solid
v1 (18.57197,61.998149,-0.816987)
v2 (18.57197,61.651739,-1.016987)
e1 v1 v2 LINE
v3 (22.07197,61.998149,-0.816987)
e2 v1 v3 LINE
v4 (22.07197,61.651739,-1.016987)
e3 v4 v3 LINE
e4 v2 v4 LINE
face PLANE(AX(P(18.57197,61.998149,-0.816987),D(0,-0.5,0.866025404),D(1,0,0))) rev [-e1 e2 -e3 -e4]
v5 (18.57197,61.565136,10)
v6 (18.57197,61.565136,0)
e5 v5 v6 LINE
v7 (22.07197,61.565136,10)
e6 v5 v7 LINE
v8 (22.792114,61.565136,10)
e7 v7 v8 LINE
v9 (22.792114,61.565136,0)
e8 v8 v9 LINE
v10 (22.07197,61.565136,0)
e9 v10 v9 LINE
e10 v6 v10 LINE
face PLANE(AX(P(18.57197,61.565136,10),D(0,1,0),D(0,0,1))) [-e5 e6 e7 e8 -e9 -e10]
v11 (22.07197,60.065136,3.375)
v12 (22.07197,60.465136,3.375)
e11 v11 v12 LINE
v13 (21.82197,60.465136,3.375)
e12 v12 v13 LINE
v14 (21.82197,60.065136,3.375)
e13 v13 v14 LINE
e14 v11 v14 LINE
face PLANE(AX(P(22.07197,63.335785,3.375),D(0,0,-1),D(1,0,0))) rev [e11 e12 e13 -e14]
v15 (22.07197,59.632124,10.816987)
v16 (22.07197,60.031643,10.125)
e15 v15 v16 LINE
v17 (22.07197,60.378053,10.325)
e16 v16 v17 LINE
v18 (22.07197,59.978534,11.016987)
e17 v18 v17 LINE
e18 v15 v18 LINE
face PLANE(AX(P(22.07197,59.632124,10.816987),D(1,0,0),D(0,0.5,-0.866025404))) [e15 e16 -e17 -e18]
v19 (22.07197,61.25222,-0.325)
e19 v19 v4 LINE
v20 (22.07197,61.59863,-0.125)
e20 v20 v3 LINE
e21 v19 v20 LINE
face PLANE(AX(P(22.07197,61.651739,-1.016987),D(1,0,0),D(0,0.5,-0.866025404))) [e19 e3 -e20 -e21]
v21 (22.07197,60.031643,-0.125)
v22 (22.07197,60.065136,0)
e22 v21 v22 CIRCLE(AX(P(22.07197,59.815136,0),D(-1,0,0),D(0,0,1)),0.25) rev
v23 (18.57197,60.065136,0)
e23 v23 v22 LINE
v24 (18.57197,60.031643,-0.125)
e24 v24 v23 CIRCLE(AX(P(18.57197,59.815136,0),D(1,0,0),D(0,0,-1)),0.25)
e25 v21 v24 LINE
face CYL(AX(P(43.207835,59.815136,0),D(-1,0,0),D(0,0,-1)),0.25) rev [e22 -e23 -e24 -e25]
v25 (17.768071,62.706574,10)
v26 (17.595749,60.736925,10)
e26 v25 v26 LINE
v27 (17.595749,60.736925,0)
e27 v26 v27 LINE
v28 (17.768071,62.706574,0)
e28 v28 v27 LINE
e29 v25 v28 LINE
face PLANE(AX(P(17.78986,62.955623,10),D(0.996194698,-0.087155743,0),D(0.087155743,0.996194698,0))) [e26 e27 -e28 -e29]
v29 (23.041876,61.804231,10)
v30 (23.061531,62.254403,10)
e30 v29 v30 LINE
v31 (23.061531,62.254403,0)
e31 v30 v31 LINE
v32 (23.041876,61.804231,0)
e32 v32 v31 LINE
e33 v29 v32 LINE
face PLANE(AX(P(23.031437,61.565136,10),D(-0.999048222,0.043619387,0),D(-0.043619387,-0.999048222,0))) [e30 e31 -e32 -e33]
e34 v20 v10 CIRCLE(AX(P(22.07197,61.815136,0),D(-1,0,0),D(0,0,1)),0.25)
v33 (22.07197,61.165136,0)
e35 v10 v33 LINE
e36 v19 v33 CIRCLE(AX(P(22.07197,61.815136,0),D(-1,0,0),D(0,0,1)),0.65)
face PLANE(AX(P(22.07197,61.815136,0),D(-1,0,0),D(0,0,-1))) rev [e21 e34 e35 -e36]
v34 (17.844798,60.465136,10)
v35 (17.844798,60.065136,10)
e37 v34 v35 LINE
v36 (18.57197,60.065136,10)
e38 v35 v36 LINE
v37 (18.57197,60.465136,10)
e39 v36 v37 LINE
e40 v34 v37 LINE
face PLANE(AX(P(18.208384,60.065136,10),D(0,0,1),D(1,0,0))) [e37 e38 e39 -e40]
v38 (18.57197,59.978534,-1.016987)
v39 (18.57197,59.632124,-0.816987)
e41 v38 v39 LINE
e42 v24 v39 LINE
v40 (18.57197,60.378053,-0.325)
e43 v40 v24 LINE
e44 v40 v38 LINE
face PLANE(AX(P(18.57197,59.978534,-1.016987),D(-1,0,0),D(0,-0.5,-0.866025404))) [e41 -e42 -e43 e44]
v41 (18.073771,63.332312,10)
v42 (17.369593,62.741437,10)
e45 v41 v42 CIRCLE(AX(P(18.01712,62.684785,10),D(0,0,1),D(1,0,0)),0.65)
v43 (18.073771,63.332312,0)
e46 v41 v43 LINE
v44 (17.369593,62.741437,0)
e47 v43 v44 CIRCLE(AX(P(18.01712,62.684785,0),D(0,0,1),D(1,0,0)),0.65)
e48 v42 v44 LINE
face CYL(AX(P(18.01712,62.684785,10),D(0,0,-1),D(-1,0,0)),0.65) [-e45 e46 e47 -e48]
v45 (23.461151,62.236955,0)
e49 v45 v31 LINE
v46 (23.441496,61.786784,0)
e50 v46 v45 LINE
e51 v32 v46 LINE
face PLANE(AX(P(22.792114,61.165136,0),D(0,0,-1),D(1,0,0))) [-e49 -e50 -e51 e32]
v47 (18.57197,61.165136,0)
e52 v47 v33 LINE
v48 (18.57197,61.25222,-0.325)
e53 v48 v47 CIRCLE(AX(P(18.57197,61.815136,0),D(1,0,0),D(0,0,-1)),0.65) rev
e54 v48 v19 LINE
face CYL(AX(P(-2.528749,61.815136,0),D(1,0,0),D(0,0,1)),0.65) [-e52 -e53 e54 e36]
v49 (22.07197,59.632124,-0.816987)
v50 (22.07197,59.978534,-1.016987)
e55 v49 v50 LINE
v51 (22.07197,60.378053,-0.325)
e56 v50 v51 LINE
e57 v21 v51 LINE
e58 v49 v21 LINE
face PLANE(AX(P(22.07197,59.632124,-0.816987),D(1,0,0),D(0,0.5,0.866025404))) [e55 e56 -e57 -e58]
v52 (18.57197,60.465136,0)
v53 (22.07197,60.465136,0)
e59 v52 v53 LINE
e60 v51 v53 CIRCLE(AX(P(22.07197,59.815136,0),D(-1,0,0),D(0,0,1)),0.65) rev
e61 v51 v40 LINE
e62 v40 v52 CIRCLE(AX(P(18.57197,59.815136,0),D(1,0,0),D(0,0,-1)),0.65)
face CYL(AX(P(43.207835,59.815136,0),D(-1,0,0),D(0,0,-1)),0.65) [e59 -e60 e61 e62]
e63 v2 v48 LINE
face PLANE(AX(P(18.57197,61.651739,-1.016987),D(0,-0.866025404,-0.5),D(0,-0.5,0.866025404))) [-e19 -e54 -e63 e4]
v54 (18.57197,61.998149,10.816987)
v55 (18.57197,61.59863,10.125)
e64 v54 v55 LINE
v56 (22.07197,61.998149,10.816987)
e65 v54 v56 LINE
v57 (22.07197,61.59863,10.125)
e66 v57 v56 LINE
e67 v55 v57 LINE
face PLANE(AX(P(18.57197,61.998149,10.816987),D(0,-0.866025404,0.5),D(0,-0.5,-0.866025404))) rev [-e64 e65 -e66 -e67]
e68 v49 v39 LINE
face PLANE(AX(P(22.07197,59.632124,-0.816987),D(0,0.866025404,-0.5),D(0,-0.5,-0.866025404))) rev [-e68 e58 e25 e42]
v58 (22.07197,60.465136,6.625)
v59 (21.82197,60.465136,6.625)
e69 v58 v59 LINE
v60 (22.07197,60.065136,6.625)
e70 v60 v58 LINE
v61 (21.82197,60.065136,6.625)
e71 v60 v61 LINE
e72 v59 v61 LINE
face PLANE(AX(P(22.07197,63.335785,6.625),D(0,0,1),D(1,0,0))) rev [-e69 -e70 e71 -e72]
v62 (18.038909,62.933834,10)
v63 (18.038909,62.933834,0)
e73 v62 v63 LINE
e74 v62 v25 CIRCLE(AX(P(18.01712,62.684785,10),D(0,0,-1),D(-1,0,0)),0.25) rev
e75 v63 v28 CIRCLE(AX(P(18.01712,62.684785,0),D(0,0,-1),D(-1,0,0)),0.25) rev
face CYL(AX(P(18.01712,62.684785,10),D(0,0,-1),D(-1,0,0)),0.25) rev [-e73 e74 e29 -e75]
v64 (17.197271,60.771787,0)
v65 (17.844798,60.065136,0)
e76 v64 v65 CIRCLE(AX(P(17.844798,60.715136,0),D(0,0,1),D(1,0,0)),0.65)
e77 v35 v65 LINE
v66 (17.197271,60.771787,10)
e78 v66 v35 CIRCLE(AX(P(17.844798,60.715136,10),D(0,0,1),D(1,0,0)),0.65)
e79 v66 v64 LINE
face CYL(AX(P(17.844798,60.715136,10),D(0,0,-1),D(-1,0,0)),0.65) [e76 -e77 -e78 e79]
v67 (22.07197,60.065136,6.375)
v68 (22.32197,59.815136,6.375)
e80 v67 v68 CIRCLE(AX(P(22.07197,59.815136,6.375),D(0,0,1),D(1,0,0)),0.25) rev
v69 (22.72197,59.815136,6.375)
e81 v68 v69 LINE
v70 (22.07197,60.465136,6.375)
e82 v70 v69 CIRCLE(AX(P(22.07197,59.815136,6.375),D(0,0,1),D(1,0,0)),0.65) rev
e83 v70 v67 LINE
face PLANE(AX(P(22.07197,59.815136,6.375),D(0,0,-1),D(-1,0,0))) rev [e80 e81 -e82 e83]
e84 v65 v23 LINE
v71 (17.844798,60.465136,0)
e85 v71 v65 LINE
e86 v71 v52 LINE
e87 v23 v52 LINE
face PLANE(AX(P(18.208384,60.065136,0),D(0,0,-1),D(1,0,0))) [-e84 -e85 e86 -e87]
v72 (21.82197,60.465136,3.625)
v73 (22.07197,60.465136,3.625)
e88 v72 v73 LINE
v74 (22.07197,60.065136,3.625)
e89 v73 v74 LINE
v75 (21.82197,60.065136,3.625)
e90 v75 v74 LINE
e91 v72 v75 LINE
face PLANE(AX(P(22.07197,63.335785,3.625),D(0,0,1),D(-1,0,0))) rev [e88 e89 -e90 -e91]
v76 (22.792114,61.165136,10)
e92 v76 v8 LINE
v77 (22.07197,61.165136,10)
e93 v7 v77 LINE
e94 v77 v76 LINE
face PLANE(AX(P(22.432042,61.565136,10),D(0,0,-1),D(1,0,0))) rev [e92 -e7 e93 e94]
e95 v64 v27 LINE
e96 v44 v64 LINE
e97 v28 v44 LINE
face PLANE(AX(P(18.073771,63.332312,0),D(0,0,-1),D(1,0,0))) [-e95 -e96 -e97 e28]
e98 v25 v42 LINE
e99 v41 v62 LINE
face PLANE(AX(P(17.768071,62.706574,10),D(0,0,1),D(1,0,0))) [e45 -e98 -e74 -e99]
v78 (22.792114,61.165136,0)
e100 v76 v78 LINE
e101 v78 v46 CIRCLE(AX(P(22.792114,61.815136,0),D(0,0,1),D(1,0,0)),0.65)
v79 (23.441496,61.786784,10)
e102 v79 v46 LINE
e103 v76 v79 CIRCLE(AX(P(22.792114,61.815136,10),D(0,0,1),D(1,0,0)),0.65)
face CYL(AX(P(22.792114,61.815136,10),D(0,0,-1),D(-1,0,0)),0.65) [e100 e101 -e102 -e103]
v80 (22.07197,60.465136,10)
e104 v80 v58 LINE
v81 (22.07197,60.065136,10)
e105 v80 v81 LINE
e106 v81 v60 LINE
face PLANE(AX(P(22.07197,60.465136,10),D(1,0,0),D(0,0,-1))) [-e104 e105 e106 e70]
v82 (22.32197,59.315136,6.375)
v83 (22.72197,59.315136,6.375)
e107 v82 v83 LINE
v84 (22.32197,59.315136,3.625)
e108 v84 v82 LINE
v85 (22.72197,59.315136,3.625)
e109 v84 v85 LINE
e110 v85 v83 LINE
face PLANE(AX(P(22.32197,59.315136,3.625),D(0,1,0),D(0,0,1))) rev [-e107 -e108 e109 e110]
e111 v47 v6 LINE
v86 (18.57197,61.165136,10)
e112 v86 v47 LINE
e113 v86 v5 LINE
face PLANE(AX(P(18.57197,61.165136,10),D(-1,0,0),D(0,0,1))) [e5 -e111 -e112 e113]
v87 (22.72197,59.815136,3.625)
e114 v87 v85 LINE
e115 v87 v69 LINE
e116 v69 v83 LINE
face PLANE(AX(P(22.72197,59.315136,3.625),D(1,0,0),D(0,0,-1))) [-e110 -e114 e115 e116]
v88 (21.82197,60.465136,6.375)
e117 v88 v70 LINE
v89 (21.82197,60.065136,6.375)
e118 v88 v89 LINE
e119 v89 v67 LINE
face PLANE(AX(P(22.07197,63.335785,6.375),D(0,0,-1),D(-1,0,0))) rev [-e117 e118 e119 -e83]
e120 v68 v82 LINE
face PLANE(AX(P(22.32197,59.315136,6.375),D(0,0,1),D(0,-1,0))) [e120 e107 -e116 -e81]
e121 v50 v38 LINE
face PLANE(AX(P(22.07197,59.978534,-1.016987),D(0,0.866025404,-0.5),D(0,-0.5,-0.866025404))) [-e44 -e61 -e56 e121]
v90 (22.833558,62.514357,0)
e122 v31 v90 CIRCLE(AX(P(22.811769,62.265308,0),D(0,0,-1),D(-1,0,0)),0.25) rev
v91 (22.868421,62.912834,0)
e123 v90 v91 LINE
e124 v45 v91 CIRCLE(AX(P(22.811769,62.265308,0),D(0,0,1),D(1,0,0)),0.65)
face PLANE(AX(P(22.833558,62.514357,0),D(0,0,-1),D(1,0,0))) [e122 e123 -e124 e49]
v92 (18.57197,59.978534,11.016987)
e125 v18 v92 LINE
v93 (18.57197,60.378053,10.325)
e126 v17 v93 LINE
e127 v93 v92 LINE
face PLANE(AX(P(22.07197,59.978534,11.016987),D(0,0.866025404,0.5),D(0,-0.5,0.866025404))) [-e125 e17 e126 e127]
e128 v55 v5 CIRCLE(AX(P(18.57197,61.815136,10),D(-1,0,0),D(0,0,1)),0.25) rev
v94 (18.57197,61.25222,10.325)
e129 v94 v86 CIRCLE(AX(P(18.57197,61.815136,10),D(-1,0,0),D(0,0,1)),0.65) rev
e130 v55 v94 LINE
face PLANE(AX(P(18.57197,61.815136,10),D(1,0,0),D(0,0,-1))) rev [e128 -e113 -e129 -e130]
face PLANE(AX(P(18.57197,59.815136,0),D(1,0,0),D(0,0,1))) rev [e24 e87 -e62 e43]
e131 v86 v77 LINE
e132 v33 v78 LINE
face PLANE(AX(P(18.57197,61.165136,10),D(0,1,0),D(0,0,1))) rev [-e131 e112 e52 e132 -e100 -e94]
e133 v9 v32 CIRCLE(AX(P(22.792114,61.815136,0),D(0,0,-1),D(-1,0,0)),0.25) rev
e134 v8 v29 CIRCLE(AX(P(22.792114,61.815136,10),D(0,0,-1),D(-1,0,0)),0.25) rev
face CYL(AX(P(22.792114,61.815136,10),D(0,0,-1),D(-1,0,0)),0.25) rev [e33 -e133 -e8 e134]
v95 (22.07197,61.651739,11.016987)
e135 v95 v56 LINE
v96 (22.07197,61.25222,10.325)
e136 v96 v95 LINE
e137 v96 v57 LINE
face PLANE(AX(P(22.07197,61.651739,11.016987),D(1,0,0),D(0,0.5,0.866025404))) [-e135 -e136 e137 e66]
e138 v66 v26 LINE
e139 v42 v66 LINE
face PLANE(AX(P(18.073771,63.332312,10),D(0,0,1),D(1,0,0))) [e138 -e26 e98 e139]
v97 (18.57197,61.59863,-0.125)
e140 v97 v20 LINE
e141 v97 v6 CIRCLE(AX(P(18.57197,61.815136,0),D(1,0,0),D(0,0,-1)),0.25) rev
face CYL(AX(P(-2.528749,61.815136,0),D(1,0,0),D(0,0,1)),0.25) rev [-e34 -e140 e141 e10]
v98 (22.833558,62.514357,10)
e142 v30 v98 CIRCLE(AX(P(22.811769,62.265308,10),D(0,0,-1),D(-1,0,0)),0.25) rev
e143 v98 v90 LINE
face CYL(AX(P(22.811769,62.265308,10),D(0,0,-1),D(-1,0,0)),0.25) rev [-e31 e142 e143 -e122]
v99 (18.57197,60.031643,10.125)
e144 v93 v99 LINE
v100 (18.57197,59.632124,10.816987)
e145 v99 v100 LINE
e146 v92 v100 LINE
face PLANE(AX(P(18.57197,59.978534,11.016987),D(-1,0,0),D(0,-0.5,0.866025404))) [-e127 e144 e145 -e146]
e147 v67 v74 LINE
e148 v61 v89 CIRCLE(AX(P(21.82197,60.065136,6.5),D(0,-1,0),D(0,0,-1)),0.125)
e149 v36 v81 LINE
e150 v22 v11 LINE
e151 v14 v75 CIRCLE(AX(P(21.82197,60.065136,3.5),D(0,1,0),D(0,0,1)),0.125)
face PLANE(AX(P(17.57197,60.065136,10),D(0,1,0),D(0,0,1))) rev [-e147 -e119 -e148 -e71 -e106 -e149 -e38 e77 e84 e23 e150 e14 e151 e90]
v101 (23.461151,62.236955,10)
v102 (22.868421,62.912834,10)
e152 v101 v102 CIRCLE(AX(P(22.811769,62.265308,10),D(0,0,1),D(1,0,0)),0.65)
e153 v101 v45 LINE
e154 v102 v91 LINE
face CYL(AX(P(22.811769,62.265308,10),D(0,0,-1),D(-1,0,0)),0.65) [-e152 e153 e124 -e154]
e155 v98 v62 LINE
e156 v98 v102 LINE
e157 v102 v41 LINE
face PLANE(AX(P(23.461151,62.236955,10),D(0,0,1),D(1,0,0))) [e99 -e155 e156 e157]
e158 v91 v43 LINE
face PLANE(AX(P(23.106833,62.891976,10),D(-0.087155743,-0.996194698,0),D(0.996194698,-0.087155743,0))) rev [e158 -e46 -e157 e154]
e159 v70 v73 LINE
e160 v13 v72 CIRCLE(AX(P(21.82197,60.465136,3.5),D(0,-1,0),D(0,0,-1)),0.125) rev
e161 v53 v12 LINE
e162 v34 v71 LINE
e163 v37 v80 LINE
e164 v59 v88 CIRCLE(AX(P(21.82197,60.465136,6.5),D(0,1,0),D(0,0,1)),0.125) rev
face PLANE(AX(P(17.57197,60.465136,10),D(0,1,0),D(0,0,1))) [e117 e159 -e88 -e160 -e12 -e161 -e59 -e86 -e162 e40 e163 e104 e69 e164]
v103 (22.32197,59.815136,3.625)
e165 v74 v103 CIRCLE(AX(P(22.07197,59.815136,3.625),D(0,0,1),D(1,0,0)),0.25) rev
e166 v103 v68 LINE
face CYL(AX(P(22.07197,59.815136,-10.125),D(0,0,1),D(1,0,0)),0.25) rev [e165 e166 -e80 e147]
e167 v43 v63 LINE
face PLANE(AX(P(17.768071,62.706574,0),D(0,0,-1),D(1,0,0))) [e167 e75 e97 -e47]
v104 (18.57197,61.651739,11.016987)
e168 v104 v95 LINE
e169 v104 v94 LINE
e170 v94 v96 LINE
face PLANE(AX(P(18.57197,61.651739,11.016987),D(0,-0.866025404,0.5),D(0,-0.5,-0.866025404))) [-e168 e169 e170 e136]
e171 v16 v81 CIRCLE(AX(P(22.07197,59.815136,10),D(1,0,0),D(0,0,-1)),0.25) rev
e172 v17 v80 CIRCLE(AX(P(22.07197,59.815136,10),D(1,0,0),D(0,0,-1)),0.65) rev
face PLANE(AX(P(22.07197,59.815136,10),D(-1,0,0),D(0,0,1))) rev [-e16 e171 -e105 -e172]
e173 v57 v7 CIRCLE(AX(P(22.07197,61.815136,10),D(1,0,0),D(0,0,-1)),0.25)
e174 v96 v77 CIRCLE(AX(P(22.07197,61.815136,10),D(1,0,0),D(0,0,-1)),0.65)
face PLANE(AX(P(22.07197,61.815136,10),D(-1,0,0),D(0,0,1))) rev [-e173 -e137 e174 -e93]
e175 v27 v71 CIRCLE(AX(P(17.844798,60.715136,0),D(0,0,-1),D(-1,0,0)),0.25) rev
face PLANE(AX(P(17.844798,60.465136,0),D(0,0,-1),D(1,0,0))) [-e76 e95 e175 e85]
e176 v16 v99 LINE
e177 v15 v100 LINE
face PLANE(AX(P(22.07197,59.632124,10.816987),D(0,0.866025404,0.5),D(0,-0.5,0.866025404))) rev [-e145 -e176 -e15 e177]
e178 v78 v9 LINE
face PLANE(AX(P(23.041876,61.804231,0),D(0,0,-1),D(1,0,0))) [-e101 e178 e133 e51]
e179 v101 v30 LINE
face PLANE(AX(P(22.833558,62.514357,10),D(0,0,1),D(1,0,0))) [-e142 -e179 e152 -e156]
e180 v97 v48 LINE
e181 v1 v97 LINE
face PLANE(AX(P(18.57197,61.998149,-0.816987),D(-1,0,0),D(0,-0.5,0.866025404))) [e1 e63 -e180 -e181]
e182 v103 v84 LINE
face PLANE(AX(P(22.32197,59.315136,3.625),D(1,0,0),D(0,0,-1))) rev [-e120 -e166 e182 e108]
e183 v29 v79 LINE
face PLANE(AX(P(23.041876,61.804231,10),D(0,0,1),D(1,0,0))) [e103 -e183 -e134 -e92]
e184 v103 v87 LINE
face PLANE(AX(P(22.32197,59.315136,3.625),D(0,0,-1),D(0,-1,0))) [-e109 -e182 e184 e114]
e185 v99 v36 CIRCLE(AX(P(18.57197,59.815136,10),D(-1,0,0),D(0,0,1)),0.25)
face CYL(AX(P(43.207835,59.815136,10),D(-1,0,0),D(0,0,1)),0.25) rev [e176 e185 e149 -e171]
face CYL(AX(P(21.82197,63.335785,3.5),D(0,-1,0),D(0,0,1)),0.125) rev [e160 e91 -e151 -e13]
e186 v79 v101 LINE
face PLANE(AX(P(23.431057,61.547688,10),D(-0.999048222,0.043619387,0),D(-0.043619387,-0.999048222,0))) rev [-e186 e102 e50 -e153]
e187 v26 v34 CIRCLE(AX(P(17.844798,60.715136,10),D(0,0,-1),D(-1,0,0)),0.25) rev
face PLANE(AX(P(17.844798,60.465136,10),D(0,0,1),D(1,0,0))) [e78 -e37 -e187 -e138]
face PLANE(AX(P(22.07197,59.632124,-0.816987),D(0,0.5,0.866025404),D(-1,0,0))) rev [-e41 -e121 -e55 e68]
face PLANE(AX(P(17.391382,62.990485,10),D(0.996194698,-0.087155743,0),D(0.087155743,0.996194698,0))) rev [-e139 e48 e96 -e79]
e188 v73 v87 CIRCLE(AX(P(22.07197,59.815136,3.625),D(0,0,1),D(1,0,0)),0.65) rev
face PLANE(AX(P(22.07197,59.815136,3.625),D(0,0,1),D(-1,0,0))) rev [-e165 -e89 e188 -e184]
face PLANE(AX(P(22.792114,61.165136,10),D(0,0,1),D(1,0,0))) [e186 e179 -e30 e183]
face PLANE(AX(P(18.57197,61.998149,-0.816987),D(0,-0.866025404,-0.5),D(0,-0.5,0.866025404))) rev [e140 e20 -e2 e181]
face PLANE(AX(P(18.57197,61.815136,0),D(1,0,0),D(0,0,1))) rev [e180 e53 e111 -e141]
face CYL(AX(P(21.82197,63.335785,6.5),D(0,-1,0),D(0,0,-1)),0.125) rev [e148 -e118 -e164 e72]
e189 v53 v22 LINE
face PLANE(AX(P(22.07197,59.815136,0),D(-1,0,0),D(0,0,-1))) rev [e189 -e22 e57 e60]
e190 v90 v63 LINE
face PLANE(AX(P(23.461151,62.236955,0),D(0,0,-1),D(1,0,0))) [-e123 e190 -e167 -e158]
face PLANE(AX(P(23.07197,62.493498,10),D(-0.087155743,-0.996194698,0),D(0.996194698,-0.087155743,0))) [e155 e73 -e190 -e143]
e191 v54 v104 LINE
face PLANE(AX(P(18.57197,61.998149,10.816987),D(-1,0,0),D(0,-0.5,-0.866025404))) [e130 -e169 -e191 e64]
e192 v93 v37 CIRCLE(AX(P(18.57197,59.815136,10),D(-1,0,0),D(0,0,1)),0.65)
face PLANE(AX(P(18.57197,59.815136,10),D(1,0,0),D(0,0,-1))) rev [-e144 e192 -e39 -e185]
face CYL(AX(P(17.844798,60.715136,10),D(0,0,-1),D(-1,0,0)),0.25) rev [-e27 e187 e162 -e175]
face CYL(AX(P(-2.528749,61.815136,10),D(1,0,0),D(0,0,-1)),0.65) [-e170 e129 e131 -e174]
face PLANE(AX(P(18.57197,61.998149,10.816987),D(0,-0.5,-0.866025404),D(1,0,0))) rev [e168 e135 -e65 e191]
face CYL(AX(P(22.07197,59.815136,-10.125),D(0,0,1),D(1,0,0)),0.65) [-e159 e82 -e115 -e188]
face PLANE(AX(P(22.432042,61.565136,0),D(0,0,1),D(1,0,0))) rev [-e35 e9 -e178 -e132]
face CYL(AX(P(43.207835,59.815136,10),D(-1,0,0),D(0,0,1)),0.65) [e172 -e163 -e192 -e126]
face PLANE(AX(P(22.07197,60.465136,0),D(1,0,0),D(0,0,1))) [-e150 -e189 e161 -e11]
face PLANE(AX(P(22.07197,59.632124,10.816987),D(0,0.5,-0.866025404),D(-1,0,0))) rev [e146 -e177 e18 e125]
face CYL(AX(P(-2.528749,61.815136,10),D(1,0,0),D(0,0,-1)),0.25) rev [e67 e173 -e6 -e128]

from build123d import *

# Parameters (mm, degrees)
BASE_FLANGE1_DEPTH       = 10
CUT_EXTRUDE1_REACH       = 27.713
MITER_START              = 3.625
MITER_FLANGE1_DEPTH      = 2.75
MITER_START_2            = 18.571970472
MITER_FLANGE4_DEPTH      = 4.220143907
MITER_START_3            = 17.844797598
MITER_FLANGE5_DEPTH      = 4.227172874
CUT_EXTRUDE8_DEPTH       = 0.727172875
CUT_EXTRUDE9_START       = -0.720143907
CUT_EXTRUDE9_DEPTH       = 0.720143907
CUT_EXTRUDE10_DEPTH      = 22.568364065
CUT_EXTRUDE10_DEPTH_BACK = 22.568364065
SKETCH26_W               = 10.008347653
SKETCH26_H               = 5.563663723


# Read off the part's stored shape, not the designer's step: Miter Flange1, Miter Flange4, Miter Flange5
# Sheet-metal steps are written as plain solids
with BuildPart() as part:
    # Sketch1 → Base-Flange1 (new body)
    with BuildSketch(Plane.XY):
        with BuildLine():
            Line((18.571970472, 61.565136218), (22.792114379, 61.565136218))
            ThreePointArc((22.792114379, 61.565136218), (22.964992643, 61.634545227), (23.041876434, 61.804231371))
            Line((23.041876434, 61.804231371), (23.061531352, 62.254403009))
            ThreePointArc((23.061531352, 62.254403009), (22.999729249, 62.43014431), (22.833558233, 62.51435653))
            Line((22.833558233, 62.51435653), (18.038908504, 62.933834027))
            ThreePointArc((18.038908504, 62.933834027), (17.856422666, 62.876296464), (17.768070893, 62.706574288))
            Line((17.768070893, 62.706574288), (17.595748923, 60.736925153))
            ThreePointArc((17.595748923, 60.736925153), (17.660478263, 60.546238666), (17.844797598, 60.465136218))
            Line((17.844797598, 60.465136218), (22.071970472, 60.465136218))
            Line((22.071970472, 60.465136218), (22.071970472, 60.065136218))
            Line((22.071970472, 60.065136218), (17.844797598, 60.065136218))
            ThreePointArc((17.844797598, 60.065136218), (17.365567329, 60.276002583), (17.197271044, 60.771787451))
            Line((17.197271044, 60.771787451), (17.369593014, 62.741436586))
            ThreePointArc((17.369593014, 62.741436586), (17.599307622, 63.182714241), (18.073770801, 63.332311907))
            Line((18.073770801, 63.332311907), (22.86842053, 62.91283441))
            ThreePointArc((22.86842053, 62.91283441), (23.300465172, 62.693882636), (23.461150641, 62.236955254))
            Line((23.461150641, 62.236955254), (23.441495723, 61.786783616))
            ThreePointArc((23.441495723, 61.786783616), (23.241597865, 61.345599642), (22.792114379, 61.165136218))
            Line((22.792114379, 61.165136218), (18.571970472, 61.165136218))
            Line((18.571970472, 61.165136218), (18.571970472, 61.565136218))
        make_face()
    extrude(amount=BASE_FLANGE1_DEPTH)

    # Sketch7 → Cut-Extrude1 (cut, up to next)
    with BuildSketch(Plane.XZ.offset(-60.065136218), mode=Mode.PRIVATE) as cut_extrude1_sk1:
        with BuildLine():
            Line((22.071970472, 3.375), (21.821970472, 3.375))
            ThreePointArc((21.821970472, 3.375), (21.696970472, 3.5), (21.821970472, 3.625))
            Line((21.821970472, 3.625), (22.071970472, 3.625))
            ThreePointArc((22.071970472, 3.625), (22.196970472, 3.5), (22.071970472, 3.375))
        make_face()
    cut_extrude1_tool1 = extrude(cut_extrude1_sk1.sketch, amount=-CUT_EXTRUDE1_REACH, mode=Mode.PRIVATE) & part.part
    # Sketch7 → Cut-Extrude1 (cut, up to next)
    with BuildSketch(Plane.XZ.offset(-60.065136218), mode=Mode.PRIVATE) as cut_extrude1_sk2:
        with BuildLine():
            Line((22.071970472, 6.375), (21.821970472, 6.375))
            ThreePointArc((21.821970472, 6.375), (21.696970472, 6.5), (21.821970472, 6.625))
            Line((21.821970472, 6.625), (22.071970472, 6.625))
            ThreePointArc((22.071970472, 6.625), (22.196970472, 6.5), (22.071970472, 6.375))
        make_face()
    cut_extrude1_tool2 = extrude(cut_extrude1_sk2.sketch, amount=-CUT_EXTRUDE1_REACH, mode=Mode.PRIVATE) & part.part
    add(cut_extrude1_tool1.solids().sort_by_distance((21.94697, 60.065136, 3.5))[0], mode=Mode.SUBTRACT)
    add(cut_extrude1_tool2.solids().sort_by_distance((21.94697, 60.065136, 6.5))[0], mode=Mode.SUBTRACT)

    # Miter Flange1 outline → Miter Flange1 (add)
    with BuildSketch(Plane.XY.offset(MITER_START)):
        with BuildLine():
            Line((22.321970472, 59.315136218), (22.721970472, 59.315136218))
            Line((22.721970472, 59.315136218), (22.721970472, 59.815136218))
            ThreePointArc((22.721970472, 59.815136218), (22.53158988, 60.274755626), (22.071970472, 60.465136218))
            Line((22.071970472, 60.465136218), (22.071970472, 60.065136218))
            ThreePointArc((22.071970472, 60.065136218), (22.248747167, 59.991912914), (22.321970472, 59.815136218))
            Line((22.321970472, 59.815136218), (22.321970472, 59.315136218))
        make_face()
    extrude(amount=MITER_FLANGE1_DEPTH)

    # Miter Flange4 outline → Miter Flange4 (add)
    with BuildSketch(Plane.YZ.offset(MITER_START_2)):
        with BuildLine():
            Line((61.99814892, 10.816987298), (61.651738758, 11.016987298))
            Line((61.651738758, 11.016987298), (61.252219705, 10.325))
            ThreePointArc((61.252219705, 10.325), (61.187284431, 10.168232379), (61.165136218, 10))
            Line((61.165136218, 10), (61.565136218, 10))
            ThreePointArc((61.565136218, 10), (61.573654761, 10.064704761), (61.598629867, 10.125))
            Line((61.598629867, 10.125), (61.99814892, 10.816987298))
        make_face()
    extrude(amount=MITER_FLANGE4_DEPTH)

    # Miter Flange5 outline → Miter Flange5 (add)
    with BuildSketch(Plane.YZ.offset(MITER_START_3)):
        with BuildLine():
            Line((59.978533677, 11.016987298), (59.632123516, 10.816987298))
            Line((59.632123516, 10.816987298), (60.031642569, 10.125))
            ThreePointArc((60.031642569, 10.125), (60.056617674, 10.064704761), (60.065136218, 10))
            Line((60.065136218, 10), (60.465136218, 10))
            ThreePointArc((60.465136218, 10), (60.442988005, 10.168232379), (60.37805273, 10.325))
            Line((60.37805273, 10.325), (59.978533677, 11.016987298))
        make_face()
    extrude(amount=MITER_FLANGE5_DEPTH)

    # Sketch20 → Cut-Extrude8 (cut)
    with BuildSketch(Plane.ZY.offset(-17.844797598)):
        with BuildLine():
            Line((10.125, 60.031642569), (10.816987298, 59.632123516))
            Line((10.816987298, 59.632123516), (11.016987298, 59.978533677))
            Line((11.016987298, 59.978533677), (10.325, 60.37805273))
            ThreePointArc((10.325, 60.37805273), (10.168232379, 60.442988005), (10, 60.465136218))
            Line((10, 60.465136218), (10, 60.065136218))
            ThreePointArc((10, 60.065136218), (10.064704761, 60.056617674), (10.125, 60.031642569))
        make_face()
    extrude(amount=-CUT_EXTRUDE8_DEPTH, mode=Mode.SUBTRACT)

    # Sketch23 → Cut-Extrude9 (cut)
    with BuildSketch(Plane(origin=(22.792114379, 0, 0), x_dir=(0, 0, -1), z_dir=(1, 0, 0)).offset(CUT_EXTRUDE9_START)):
        with BuildLine():
            Line((-10.125, 61.598629867), (-10.816987298, 61.99814892))
            Line((-10.816987298, 61.99814892), (-11.016987298, 61.651738758))
            Line((-11.016987298, 61.651738758), (-10.325, 61.252219705))
            ThreePointArc((-10.325, 61.252219705), (-10.168232379, 61.187284431), (-10, 61.165136218))
            Line((-10, 61.165136218), (-10, 61.565136218))
            ThreePointArc((-10, 61.565136218), (-10.064704761, 61.573654761), (-10.125, 61.598629867))
        make_face()
    extrude(amount=CUT_EXTRUDE9_DEPTH, mode=Mode.SUBTRACT)

    # Sketch26 → Cut-Extrude10 (cut, two sides: drawn at the far end of the back side and taken through both)
    with BuildSketch(Plane(origin=(5.63606087, 64.420470526, 0), x_dir=(0.9961946980917451, -0.08715574274766313, 0), z_dir=(0.08715574274766313, 0.9961946980917451, 0)).offset(-CUT_EXTRUDE10_DEPTH_BACK)):
        with Locations((14.807454486, -2.218168138)):
            Rectangle(SKETCH26_W, SKETCH26_H)
    extrude(amount=CUT_EXTRUDE10_DEPTH + CUT_EXTRUDE10_DEPTH_BACK, mode=Mode.SUBTRACT)

    # Mirror1: part across plane


with BuildPart() as part_1:
    add(part.part)
    add(part.part.mirror(Plane(origin=(25.016835548, 58.630796571, 5), x_dir=(1, 0, 0), z_dir=(0, 0, 1))))


solid = part_1.part
